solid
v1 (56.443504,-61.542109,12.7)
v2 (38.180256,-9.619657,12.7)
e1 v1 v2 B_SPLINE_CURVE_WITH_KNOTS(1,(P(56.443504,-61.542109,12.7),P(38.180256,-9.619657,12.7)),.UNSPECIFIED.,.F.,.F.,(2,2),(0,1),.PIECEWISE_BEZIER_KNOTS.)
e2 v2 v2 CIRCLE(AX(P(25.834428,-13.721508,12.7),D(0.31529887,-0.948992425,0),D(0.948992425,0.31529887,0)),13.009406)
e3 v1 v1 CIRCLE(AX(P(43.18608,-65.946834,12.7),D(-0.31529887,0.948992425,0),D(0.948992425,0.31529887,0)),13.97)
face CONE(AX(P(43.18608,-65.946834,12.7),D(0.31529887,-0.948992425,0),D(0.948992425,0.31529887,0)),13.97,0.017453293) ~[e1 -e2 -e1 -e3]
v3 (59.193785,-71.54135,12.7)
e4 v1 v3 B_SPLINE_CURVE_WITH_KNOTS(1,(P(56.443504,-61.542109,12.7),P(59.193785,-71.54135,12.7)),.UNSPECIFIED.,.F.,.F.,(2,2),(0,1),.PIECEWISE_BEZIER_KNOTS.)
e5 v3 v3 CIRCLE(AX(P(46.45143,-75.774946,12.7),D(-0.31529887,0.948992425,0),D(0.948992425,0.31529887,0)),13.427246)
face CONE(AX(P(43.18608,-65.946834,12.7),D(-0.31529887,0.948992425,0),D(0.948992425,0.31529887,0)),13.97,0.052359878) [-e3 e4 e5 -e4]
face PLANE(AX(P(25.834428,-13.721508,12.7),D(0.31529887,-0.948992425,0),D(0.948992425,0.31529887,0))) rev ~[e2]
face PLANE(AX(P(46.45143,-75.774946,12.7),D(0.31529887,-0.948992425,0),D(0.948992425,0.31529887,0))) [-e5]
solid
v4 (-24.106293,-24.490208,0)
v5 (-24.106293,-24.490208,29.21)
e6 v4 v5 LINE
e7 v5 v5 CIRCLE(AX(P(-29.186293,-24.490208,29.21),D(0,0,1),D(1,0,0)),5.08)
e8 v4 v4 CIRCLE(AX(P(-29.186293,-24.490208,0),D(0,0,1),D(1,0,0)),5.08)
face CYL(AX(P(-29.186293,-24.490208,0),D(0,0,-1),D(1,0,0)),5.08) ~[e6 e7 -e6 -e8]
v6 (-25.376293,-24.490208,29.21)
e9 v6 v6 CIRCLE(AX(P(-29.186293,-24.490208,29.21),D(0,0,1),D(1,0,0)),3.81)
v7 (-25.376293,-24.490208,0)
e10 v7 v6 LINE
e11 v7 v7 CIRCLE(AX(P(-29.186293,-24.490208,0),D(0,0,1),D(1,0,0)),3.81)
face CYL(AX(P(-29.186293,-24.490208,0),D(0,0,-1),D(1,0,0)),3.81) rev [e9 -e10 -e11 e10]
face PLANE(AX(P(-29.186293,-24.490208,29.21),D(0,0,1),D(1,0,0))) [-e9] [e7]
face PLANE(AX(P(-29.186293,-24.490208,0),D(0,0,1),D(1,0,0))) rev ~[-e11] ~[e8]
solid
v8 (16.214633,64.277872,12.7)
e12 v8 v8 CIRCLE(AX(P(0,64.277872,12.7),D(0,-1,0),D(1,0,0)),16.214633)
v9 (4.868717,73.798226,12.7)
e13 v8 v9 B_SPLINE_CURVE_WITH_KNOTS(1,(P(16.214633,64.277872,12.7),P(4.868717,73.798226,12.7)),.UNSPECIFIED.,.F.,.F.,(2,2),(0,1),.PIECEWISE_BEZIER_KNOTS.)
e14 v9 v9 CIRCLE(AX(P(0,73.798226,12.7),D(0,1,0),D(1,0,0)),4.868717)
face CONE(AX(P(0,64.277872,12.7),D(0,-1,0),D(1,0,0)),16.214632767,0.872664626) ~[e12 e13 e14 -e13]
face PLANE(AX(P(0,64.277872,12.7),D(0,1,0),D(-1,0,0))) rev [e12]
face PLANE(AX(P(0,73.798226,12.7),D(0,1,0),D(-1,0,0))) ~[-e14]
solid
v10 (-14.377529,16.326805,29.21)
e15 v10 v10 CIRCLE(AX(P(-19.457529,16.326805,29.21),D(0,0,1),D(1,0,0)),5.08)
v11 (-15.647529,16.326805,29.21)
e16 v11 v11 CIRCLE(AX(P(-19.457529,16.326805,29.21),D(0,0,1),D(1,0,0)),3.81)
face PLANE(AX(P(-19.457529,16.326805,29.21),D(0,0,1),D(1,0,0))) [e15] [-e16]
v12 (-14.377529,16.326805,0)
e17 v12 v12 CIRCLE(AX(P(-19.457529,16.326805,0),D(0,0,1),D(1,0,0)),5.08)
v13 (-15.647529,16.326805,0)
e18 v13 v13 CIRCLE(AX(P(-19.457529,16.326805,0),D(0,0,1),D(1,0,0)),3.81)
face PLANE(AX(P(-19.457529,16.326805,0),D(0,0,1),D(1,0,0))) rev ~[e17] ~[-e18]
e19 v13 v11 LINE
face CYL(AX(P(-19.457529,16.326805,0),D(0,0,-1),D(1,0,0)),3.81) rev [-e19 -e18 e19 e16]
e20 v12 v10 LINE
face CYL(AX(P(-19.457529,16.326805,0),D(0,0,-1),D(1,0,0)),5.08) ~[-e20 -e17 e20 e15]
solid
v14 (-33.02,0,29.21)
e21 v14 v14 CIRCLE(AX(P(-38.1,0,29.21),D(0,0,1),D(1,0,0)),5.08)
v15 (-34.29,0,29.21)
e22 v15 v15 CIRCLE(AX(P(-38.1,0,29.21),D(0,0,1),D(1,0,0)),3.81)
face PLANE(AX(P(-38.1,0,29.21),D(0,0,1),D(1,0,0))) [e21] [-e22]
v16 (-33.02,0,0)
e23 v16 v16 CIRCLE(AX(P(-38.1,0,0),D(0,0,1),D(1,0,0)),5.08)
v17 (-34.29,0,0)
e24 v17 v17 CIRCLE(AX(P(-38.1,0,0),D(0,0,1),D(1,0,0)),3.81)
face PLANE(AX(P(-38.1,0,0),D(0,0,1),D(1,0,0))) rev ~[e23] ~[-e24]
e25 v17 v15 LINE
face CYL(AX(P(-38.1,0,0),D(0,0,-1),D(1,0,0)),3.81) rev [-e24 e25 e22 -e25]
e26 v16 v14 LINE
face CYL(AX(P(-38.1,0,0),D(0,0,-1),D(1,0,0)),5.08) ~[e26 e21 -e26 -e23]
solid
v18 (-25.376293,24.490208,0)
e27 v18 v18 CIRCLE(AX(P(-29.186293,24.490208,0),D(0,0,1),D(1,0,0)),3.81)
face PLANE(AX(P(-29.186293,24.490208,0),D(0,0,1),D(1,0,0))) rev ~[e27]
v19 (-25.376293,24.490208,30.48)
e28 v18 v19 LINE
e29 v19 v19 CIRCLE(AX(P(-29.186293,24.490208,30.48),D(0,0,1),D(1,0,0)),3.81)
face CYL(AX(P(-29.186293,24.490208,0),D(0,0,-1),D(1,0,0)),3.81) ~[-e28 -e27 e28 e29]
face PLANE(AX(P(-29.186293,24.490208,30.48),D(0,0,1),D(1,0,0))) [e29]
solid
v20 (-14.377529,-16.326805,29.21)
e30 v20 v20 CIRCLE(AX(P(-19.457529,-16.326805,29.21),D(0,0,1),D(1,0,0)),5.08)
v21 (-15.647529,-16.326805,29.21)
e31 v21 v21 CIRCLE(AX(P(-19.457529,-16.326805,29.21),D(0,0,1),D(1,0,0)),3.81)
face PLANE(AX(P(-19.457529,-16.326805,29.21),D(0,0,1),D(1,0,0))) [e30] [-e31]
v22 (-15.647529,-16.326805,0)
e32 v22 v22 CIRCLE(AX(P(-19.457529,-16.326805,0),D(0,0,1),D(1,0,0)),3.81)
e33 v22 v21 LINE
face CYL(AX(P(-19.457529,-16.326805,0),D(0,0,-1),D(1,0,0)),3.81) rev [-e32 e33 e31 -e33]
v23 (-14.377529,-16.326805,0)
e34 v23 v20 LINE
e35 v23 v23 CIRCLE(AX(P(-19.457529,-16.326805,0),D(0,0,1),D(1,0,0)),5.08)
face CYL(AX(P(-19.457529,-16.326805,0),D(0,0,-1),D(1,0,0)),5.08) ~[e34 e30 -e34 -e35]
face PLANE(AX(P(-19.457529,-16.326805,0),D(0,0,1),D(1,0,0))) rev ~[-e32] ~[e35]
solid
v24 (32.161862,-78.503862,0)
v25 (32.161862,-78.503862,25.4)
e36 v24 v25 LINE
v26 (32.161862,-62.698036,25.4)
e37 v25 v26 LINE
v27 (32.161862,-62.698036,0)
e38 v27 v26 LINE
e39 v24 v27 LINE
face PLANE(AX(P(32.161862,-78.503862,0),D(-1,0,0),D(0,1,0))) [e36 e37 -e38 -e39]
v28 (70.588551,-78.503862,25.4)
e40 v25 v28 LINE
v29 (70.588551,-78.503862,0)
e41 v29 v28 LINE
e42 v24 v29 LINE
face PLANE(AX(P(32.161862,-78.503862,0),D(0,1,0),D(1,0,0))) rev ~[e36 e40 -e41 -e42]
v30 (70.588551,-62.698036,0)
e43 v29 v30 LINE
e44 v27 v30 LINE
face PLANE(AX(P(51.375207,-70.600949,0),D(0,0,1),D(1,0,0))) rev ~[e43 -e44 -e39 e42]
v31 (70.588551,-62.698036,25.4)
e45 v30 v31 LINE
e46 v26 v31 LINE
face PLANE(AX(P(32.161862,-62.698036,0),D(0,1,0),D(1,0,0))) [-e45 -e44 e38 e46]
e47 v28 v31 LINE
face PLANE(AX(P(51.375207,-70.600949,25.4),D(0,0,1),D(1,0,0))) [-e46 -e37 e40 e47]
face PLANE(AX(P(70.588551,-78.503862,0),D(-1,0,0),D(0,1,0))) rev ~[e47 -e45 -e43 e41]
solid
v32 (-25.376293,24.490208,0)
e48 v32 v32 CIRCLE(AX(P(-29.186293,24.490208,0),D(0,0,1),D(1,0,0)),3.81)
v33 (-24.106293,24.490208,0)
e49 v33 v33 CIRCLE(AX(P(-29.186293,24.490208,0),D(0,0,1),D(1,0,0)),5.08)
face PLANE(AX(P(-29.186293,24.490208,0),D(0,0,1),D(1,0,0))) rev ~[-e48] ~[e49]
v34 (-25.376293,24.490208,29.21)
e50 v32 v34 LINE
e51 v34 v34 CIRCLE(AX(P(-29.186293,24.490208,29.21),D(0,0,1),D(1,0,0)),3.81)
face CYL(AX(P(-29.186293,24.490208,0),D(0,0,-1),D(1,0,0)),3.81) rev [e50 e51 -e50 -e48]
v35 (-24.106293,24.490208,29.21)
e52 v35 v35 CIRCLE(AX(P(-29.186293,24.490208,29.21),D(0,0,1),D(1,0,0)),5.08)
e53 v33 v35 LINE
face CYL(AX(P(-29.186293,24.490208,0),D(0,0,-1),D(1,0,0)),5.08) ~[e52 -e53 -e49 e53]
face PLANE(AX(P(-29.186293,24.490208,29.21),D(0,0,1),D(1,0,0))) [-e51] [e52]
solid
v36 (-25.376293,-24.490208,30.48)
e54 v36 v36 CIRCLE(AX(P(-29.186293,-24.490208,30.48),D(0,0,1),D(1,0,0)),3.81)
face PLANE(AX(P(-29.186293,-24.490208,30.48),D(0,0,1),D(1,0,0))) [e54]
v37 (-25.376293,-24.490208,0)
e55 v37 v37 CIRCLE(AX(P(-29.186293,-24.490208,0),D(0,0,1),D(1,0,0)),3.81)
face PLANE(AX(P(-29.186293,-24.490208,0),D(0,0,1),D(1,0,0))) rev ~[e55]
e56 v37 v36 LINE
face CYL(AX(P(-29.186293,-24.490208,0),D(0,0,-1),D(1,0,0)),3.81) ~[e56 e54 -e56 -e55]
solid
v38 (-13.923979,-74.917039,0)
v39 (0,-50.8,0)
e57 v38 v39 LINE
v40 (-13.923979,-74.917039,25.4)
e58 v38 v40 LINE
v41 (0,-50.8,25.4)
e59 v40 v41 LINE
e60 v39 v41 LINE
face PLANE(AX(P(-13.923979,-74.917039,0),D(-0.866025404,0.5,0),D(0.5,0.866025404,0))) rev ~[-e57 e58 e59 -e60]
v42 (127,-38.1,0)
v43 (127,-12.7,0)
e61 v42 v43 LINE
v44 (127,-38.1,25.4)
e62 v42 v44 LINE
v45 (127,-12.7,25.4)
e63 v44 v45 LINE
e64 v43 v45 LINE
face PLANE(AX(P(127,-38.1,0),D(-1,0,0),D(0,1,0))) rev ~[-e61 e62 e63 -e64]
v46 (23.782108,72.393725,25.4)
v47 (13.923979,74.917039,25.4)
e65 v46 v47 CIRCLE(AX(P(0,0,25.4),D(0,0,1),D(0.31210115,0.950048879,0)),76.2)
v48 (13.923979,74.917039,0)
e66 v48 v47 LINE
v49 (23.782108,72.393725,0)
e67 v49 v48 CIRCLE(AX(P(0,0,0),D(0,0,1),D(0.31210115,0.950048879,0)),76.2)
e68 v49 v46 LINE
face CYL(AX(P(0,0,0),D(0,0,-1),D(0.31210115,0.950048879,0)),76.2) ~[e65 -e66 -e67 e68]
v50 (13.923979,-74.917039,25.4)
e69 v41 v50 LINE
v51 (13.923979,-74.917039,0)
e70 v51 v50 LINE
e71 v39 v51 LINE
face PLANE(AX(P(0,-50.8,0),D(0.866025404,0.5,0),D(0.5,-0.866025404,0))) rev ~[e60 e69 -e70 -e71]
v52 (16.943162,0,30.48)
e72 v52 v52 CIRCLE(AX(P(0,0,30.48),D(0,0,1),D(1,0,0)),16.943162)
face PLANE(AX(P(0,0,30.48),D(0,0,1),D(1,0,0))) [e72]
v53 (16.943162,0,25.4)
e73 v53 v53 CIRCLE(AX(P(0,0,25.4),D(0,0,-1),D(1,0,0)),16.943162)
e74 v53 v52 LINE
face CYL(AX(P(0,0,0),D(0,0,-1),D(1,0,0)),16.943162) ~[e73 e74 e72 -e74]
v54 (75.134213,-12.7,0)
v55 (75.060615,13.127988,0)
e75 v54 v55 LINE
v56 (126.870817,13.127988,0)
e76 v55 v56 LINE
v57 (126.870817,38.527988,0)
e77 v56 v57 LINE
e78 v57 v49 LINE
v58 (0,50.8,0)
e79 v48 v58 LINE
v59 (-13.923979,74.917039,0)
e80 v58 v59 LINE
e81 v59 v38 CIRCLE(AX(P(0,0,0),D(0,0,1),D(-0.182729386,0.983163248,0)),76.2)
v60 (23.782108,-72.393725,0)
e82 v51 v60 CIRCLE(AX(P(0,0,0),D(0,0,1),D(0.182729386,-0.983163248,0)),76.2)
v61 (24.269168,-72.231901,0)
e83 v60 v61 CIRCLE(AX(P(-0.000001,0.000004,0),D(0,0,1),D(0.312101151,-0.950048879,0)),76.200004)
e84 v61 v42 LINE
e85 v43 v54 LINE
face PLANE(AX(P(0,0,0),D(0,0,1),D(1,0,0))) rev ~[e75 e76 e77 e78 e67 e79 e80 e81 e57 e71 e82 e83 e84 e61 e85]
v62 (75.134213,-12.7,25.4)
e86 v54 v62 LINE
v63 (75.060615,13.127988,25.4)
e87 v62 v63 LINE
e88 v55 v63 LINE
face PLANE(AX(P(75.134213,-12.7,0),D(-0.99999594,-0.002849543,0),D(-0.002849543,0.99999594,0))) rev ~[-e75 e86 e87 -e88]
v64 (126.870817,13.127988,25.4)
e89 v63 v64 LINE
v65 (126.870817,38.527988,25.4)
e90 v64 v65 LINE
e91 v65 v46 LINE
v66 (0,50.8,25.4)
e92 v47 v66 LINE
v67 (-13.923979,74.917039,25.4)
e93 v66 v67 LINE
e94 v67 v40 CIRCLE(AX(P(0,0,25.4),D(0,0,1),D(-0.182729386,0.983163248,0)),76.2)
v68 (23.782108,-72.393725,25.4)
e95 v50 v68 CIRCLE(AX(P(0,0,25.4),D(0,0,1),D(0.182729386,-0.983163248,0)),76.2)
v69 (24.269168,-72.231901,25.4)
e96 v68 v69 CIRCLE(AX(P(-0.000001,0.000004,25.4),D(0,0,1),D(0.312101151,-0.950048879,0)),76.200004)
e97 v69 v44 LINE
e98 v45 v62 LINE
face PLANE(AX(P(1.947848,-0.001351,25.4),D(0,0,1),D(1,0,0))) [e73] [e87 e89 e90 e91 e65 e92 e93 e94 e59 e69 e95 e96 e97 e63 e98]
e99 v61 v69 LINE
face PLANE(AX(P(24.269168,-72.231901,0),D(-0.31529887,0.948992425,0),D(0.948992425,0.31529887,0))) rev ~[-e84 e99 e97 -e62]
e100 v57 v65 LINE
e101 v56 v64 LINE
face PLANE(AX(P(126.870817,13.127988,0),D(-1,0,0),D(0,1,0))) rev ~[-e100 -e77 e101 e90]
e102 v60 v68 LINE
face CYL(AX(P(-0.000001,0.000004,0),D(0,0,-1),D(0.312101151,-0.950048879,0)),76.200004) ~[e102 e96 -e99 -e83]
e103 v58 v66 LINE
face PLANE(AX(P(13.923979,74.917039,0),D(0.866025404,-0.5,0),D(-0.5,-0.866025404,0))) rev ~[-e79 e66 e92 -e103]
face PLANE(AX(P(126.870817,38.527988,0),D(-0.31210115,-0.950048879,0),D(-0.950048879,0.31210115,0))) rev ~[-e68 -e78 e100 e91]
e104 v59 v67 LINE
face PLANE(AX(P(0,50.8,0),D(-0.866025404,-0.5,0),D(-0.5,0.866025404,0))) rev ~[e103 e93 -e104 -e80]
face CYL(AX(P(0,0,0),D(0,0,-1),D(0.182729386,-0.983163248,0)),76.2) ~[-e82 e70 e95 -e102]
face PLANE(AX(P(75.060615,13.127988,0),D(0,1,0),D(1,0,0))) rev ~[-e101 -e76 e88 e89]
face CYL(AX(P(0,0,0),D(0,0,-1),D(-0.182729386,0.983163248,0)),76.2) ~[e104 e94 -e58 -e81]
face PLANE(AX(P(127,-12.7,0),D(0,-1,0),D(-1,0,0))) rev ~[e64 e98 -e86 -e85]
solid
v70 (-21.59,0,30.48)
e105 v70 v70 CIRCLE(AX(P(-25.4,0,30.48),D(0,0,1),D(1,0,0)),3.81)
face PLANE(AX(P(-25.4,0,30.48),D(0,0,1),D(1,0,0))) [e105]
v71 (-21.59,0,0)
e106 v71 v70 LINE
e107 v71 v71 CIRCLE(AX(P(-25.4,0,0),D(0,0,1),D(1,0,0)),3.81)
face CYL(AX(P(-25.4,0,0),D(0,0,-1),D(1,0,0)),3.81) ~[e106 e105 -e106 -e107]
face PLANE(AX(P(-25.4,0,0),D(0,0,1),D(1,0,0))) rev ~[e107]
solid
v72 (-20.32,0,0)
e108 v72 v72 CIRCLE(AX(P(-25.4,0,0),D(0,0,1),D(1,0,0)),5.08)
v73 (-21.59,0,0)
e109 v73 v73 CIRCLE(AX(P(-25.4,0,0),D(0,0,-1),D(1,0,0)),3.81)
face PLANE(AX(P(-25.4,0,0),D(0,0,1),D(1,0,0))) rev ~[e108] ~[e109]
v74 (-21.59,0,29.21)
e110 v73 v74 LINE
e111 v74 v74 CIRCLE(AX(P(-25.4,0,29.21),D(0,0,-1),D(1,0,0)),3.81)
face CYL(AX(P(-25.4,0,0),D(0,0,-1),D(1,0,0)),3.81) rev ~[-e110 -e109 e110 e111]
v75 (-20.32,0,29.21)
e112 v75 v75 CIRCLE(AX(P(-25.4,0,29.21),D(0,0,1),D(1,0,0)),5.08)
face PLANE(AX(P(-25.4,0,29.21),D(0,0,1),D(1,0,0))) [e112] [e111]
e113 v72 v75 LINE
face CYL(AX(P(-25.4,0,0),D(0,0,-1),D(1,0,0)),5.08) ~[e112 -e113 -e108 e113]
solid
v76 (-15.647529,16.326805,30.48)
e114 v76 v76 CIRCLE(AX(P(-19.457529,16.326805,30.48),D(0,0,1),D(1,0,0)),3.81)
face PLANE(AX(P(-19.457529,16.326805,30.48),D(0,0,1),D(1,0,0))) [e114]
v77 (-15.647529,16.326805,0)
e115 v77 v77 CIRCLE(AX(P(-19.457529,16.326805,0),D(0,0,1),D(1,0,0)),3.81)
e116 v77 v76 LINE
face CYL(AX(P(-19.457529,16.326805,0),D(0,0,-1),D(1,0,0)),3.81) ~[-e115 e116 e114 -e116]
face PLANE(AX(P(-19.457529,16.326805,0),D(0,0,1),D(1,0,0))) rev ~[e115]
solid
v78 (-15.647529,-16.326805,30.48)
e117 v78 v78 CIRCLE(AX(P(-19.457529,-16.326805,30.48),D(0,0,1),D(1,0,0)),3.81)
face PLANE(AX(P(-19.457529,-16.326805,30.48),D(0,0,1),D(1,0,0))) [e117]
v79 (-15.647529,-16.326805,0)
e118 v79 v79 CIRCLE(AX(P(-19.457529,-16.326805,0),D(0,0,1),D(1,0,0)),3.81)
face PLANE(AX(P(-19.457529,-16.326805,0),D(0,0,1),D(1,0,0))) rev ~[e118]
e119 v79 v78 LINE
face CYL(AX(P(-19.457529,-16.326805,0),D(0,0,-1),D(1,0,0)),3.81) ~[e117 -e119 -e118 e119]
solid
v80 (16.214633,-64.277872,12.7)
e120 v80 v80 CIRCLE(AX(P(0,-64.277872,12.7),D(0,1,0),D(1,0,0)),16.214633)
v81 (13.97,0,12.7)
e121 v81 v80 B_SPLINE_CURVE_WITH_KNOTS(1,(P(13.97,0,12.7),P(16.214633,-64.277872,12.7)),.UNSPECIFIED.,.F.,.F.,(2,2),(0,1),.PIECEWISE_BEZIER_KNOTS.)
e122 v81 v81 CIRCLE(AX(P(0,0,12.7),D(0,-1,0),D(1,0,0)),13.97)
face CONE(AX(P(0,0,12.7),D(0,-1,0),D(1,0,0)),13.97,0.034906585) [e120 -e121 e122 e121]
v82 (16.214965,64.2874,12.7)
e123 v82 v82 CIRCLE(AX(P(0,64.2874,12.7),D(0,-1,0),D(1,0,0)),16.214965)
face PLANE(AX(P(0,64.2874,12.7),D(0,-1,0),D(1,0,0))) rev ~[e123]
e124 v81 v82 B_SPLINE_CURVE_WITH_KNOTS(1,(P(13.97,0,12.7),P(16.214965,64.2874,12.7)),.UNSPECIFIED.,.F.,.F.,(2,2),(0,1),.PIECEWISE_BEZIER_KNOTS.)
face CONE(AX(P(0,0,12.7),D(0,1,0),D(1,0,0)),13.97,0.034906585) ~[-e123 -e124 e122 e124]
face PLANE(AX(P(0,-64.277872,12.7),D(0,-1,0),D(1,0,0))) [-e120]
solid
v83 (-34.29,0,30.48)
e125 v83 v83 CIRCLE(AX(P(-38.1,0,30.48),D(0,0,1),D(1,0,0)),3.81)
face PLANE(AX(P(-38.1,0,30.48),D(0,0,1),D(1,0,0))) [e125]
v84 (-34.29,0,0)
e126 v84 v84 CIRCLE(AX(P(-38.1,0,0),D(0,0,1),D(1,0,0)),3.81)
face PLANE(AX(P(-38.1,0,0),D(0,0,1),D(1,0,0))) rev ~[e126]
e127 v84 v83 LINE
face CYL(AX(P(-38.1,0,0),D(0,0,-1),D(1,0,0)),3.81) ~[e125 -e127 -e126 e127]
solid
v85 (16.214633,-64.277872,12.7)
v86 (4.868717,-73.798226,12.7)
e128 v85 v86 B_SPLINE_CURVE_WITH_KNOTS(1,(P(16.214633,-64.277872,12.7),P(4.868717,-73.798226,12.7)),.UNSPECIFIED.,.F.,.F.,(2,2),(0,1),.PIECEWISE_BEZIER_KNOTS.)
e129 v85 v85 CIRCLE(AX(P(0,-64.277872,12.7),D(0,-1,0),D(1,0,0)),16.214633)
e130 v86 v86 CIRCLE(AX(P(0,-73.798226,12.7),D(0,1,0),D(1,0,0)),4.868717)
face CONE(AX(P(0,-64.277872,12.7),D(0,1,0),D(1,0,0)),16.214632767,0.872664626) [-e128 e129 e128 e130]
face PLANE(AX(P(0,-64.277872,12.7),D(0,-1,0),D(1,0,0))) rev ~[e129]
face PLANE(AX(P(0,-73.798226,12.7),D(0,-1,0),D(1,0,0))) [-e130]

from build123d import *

# Parameters (mm, degrees)
F1_DEPTH       = 25.4
F2_R           = 16.9431619962
F3_DEPTH       = 30.48
F4_R           = 3.81
F5_DEPTH       = 30.48
F4_R_2         = 5.08
F6_DEPTH       = 29.21
F7_R           = 13.97
F8_DEPTH       = 64.2778724432
F8_TAPER       = -2
F8_DEPTH_BACK  = 64.2874
F8_TAPER_BACK  = -2
F9_R           = 16.214632767
F10_DEPTH      = 9.5203537494
F10_TAPER      = 50
F13_R          = 13.97
F14_DEPTH      = 55.0323948264
F14_TAPER      = 1
F14_DEPTH_BACK = 10.3563647717
F14_TAPER_BACK = 3
F15_W          = 38.4266898036
F15_H          = 15.8058255911
F16_DEPTH      = 25.4


with BuildPart() as f1:
    # F0 (on Top) → F1 (new body)
    with BuildSketch(Plane.XY):
        with BuildLine():
            Line((75.1342132454, -12.7), (75.0606149769, 13.1279883946))
            ThreePointArc((75.0606149769, 13.1279883946), (57.6244550994, 49.8584212997), (23.7821076654, 72.3937245553))
            ThreePointArc((23.7821076654, 72.3937245553), (18.8952117411, 73.8201258009), (13.9239792282, 74.9170394667))
            Line((13.9239792282, 74.9170394667), (0, 50.8))
            Line((0, 50.8), (-13.9239792282, 74.9170394667))
            ThreePointArc((-13.9239792282, 74.9170394667), (-76.2, 0), (-13.9239792282, -74.9170394667))
            Line((-13.9239792282, -74.9170394667), (0, -50.8))
            Line((0, -50.8), (13.9239792282, -74.9170394667))
            ThreePointArc((13.9239792282, -74.9170394667), (18.8952117411, -73.8201258009), (23.7821076654, -72.3937245553))
            Line((23.7821076654, -72.3937245553), (24.2691676459, -72.2319008595))
            ThreePointArc((24.2691676459, -72.2319008595), (57.9333223468, -49.4991935476), (75.1342132454, -12.7))
        make_face()
        with BuildLine():
            ThreePointArc((23.7821076654, 72.3937245553), (57.6244550994, 49.8584212997), (75.0606149769, 13.1279883946))
            Line((75.0606149769, 13.1279883946), (126.8708166217, 13.1279883946))
            Line((126.8708166217, 13.1279883946), (126.8708166217, 38.5279883946))
            Line((126.8708166217, 38.5279883946), (23.7821076654, 72.3937245553))
        make_face()
        with BuildLine():
            Line((127, -12.7), (75.1342132454, -12.7))
            ThreePointArc((75.1342132454, -12.7), (57.9333223468, -49.4991935476), (24.2691676459, -72.2319008595))
            Line((24.2691676459, -72.2319008595), (127, -38.1))
            Line((127, -38.1), (127, -12.7))
        make_face()
        with BuildLine():
            ThreePointArc((23.7821076654, -72.3937245553), (24.0257738998, -72.3132227778), (24.2691676459, -72.2319008595))
            Line((24.2691676459, -72.2319008595), (23.7821076654, -72.3937245553))
        make_face()
    extrude(amount=F1_DEPTH)

    # F2 (on Top) → F3 (join)
    with BuildSketch(Plane.XY):
        Circle(F2_R)
    extrude(amount=F3_DEPTH)


with BuildPart() as f5:
    # F4 (on Top) → F5 (new body)
    with BuildSketch(Plane.XY):
        with Locations((-19.4575288552, 16.326805286)):
            Circle(F4_R)
    extrude(amount=F5_DEPTH)


with BuildPart() as f5b:
    # F4 (on Top) → F5, piece 2 (new body)
    with BuildSketch(Plane.XY):
        with Locations((-29.1862932828, 24.4902079291)):
            Circle(F4_R)
    extrude(amount=F5_DEPTH)


with BuildPart() as f5c:
    # F4 (on Top) → F5, piece 3 (new body)
    with BuildSketch(Plane.XY):
        with Locations((-38.1, 0)):
            Circle(F4_R)
    extrude(amount=F5_DEPTH)


with BuildPart() as f5d:
    # F4 (on Top) → F5, piece 4 (new body)
    with BuildSketch(Plane.XY):
        with BuildLine():
            ThreePointArc((-29.21, 0), (-25.4, -3.81), (-21.59, 0))
            ThreePointArc((-21.59, 0), (-25.4, 3.81), (-29.21, 0))
        make_face()
    extrude(amount=F5_DEPTH)


with BuildPart() as f5e:
    # F4 (on Top) → F5, piece 5 (new body)
    with BuildSketch(Plane.XY):
        with Locations((-19.4575288552, -16.326805286)):
            Circle(F4_R)
    extrude(amount=F5_DEPTH)


with BuildPart() as f5f:
    # F4 (on Top) → F5, piece 6 (new body)
    with BuildSketch(Plane.XY):
        with Locations((-29.1862932828, -24.4902079291)):
            Circle(F4_R)
    extrude(amount=F5_DEPTH)


with BuildPart() as f6:
    # F4 (on Top) → F6 (new body)
    with BuildSketch(Plane.XY):
        with Locations((-29.1862932828, -24.4902079291)):
            Circle(F4_R_2)
        with Locations((-29.1862932828, -24.4902079291)):
            Circle(F4_R, mode=Mode.SUBTRACT)
    extrude(amount=F6_DEPTH)


with BuildPart() as f6b:
    # F4 (on Top) → F6, piece 2 (new body)
    with BuildSketch(Plane.XY):
        with Locations((-19.4575288552, -16.326805286)):
            Circle(F4_R_2)
        with Locations((-19.4575288552, -16.326805286)):
            Circle(F4_R, mode=Mode.SUBTRACT)
    extrude(amount=F6_DEPTH)


with BuildPart() as f6c:
    # F4 (on Top) → F6, piece 3 (new body)
    with BuildSketch(Plane.XY):
        with Locations((-25.4, 0)):
            Circle(F4_R_2)
        with BuildLine():
            ThreePointArc((-29.21, 0), (-25.4, 3.81), (-21.59, 0))
            ThreePointArc((-21.59, 0), (-25.4, -3.81), (-29.21, 0))
        make_face(mode=Mode.SUBTRACT)
    extrude(amount=F6_DEPTH)


with BuildPart() as f6d:
    # F4 (on Top) → F6, piece 4 (new body)
    with BuildSketch(Plane.XY):
        with Locations((-38.1, 0)):
            Circle(F4_R_2)
        with Locations((-38.1, 0)):
            Circle(F4_R, mode=Mode.SUBTRACT)
    extrude(amount=F6_DEPTH)


with BuildPart() as f6e:
    # F4 (on Top) → F6, piece 5 (new body)
    with BuildSketch(Plane.XY):
        with Locations((-19.4575288552, 16.326805286)):
            Circle(F4_R_2)
        with Locations((-19.4575288552, 16.326805286)):
            Circle(F4_R, mode=Mode.SUBTRACT)
    extrude(amount=F6_DEPTH)


with BuildPart() as f6f:
    # F4 (on Top) → F6, piece 6 (new body)
    with BuildSketch(Plane.XY):
        with Locations((-29.1862932828, 24.4902079291)):
            Circle(F4_R_2)
        with Locations((-29.1862932828, 24.4902079291)):
            Circle(F4_R, mode=Mode.SUBTRACT)
    extrude(amount=F6_DEPTH)


with BuildPart() as f8:
    # F7 (on Front) → F8 (new body, two sides)
    with BuildSketch(Plane.XZ) as f8_sk:
        with Locations((0, 12.7)):
            Circle(F7_R)
    extrude(amount=F8_DEPTH, taper=F8_TAPER)
    extrude(f8_sk.sketch, amount=-F8_DEPTH_BACK, taper=F8_TAPER_BACK)


with BuildPart() as f10:
    # F9 (on face) → F10 (new body)
    with BuildSketch(Plane.XZ.offset(64.2778724432)):
        with Locations((0, 12.7)):
            Circle(F9_R)
    extrude(amount=F10_DEPTH, taper=F10_TAPER)


with BuildPart() as f11_1:
    # F11: instance of F10
    add(f10.part.mirror(Plane.XZ))


with BuildPart() as f14:
    # F13 (on offset) → F14 (new body, two sides)
    with BuildSketch(Plane(origin=(24.0256376556, -72.3128127074, 0), x_dir=(0.9489924249, 0.3152988701, 0), z_dir=(0.3152988701, -0.9489924249, 0))) as f14_sk:
        with Locations((20.1903004199, 12.7)):
            Circle(F13_R)
    extrude(amount=-F14_DEPTH, taper=F14_TAPER)
    extrude(f14_sk.sketch, amount=F14_DEPTH_BACK, taper=F14_TAPER_BACK)


with BuildPart() as f16:
    # F15 (on Top) → F16 (new body)
    with BuildSketch(Plane.XY):
        with Locations((51.3752065599, -70.6009492278)):
            Rectangle(F15_W, F15_H)
    extrude(amount=F16_DEPTH)


solid = Compound([f1.part, f5.part, f5b.part, f5c.part, f5d.part, f5e.part, f5f.part, f6.part, f6b.part, f6c.part, f6d.part, f6e.part, f6f.part, f8.part, f10.part, f11_1.part, f14.part, f16.part])
